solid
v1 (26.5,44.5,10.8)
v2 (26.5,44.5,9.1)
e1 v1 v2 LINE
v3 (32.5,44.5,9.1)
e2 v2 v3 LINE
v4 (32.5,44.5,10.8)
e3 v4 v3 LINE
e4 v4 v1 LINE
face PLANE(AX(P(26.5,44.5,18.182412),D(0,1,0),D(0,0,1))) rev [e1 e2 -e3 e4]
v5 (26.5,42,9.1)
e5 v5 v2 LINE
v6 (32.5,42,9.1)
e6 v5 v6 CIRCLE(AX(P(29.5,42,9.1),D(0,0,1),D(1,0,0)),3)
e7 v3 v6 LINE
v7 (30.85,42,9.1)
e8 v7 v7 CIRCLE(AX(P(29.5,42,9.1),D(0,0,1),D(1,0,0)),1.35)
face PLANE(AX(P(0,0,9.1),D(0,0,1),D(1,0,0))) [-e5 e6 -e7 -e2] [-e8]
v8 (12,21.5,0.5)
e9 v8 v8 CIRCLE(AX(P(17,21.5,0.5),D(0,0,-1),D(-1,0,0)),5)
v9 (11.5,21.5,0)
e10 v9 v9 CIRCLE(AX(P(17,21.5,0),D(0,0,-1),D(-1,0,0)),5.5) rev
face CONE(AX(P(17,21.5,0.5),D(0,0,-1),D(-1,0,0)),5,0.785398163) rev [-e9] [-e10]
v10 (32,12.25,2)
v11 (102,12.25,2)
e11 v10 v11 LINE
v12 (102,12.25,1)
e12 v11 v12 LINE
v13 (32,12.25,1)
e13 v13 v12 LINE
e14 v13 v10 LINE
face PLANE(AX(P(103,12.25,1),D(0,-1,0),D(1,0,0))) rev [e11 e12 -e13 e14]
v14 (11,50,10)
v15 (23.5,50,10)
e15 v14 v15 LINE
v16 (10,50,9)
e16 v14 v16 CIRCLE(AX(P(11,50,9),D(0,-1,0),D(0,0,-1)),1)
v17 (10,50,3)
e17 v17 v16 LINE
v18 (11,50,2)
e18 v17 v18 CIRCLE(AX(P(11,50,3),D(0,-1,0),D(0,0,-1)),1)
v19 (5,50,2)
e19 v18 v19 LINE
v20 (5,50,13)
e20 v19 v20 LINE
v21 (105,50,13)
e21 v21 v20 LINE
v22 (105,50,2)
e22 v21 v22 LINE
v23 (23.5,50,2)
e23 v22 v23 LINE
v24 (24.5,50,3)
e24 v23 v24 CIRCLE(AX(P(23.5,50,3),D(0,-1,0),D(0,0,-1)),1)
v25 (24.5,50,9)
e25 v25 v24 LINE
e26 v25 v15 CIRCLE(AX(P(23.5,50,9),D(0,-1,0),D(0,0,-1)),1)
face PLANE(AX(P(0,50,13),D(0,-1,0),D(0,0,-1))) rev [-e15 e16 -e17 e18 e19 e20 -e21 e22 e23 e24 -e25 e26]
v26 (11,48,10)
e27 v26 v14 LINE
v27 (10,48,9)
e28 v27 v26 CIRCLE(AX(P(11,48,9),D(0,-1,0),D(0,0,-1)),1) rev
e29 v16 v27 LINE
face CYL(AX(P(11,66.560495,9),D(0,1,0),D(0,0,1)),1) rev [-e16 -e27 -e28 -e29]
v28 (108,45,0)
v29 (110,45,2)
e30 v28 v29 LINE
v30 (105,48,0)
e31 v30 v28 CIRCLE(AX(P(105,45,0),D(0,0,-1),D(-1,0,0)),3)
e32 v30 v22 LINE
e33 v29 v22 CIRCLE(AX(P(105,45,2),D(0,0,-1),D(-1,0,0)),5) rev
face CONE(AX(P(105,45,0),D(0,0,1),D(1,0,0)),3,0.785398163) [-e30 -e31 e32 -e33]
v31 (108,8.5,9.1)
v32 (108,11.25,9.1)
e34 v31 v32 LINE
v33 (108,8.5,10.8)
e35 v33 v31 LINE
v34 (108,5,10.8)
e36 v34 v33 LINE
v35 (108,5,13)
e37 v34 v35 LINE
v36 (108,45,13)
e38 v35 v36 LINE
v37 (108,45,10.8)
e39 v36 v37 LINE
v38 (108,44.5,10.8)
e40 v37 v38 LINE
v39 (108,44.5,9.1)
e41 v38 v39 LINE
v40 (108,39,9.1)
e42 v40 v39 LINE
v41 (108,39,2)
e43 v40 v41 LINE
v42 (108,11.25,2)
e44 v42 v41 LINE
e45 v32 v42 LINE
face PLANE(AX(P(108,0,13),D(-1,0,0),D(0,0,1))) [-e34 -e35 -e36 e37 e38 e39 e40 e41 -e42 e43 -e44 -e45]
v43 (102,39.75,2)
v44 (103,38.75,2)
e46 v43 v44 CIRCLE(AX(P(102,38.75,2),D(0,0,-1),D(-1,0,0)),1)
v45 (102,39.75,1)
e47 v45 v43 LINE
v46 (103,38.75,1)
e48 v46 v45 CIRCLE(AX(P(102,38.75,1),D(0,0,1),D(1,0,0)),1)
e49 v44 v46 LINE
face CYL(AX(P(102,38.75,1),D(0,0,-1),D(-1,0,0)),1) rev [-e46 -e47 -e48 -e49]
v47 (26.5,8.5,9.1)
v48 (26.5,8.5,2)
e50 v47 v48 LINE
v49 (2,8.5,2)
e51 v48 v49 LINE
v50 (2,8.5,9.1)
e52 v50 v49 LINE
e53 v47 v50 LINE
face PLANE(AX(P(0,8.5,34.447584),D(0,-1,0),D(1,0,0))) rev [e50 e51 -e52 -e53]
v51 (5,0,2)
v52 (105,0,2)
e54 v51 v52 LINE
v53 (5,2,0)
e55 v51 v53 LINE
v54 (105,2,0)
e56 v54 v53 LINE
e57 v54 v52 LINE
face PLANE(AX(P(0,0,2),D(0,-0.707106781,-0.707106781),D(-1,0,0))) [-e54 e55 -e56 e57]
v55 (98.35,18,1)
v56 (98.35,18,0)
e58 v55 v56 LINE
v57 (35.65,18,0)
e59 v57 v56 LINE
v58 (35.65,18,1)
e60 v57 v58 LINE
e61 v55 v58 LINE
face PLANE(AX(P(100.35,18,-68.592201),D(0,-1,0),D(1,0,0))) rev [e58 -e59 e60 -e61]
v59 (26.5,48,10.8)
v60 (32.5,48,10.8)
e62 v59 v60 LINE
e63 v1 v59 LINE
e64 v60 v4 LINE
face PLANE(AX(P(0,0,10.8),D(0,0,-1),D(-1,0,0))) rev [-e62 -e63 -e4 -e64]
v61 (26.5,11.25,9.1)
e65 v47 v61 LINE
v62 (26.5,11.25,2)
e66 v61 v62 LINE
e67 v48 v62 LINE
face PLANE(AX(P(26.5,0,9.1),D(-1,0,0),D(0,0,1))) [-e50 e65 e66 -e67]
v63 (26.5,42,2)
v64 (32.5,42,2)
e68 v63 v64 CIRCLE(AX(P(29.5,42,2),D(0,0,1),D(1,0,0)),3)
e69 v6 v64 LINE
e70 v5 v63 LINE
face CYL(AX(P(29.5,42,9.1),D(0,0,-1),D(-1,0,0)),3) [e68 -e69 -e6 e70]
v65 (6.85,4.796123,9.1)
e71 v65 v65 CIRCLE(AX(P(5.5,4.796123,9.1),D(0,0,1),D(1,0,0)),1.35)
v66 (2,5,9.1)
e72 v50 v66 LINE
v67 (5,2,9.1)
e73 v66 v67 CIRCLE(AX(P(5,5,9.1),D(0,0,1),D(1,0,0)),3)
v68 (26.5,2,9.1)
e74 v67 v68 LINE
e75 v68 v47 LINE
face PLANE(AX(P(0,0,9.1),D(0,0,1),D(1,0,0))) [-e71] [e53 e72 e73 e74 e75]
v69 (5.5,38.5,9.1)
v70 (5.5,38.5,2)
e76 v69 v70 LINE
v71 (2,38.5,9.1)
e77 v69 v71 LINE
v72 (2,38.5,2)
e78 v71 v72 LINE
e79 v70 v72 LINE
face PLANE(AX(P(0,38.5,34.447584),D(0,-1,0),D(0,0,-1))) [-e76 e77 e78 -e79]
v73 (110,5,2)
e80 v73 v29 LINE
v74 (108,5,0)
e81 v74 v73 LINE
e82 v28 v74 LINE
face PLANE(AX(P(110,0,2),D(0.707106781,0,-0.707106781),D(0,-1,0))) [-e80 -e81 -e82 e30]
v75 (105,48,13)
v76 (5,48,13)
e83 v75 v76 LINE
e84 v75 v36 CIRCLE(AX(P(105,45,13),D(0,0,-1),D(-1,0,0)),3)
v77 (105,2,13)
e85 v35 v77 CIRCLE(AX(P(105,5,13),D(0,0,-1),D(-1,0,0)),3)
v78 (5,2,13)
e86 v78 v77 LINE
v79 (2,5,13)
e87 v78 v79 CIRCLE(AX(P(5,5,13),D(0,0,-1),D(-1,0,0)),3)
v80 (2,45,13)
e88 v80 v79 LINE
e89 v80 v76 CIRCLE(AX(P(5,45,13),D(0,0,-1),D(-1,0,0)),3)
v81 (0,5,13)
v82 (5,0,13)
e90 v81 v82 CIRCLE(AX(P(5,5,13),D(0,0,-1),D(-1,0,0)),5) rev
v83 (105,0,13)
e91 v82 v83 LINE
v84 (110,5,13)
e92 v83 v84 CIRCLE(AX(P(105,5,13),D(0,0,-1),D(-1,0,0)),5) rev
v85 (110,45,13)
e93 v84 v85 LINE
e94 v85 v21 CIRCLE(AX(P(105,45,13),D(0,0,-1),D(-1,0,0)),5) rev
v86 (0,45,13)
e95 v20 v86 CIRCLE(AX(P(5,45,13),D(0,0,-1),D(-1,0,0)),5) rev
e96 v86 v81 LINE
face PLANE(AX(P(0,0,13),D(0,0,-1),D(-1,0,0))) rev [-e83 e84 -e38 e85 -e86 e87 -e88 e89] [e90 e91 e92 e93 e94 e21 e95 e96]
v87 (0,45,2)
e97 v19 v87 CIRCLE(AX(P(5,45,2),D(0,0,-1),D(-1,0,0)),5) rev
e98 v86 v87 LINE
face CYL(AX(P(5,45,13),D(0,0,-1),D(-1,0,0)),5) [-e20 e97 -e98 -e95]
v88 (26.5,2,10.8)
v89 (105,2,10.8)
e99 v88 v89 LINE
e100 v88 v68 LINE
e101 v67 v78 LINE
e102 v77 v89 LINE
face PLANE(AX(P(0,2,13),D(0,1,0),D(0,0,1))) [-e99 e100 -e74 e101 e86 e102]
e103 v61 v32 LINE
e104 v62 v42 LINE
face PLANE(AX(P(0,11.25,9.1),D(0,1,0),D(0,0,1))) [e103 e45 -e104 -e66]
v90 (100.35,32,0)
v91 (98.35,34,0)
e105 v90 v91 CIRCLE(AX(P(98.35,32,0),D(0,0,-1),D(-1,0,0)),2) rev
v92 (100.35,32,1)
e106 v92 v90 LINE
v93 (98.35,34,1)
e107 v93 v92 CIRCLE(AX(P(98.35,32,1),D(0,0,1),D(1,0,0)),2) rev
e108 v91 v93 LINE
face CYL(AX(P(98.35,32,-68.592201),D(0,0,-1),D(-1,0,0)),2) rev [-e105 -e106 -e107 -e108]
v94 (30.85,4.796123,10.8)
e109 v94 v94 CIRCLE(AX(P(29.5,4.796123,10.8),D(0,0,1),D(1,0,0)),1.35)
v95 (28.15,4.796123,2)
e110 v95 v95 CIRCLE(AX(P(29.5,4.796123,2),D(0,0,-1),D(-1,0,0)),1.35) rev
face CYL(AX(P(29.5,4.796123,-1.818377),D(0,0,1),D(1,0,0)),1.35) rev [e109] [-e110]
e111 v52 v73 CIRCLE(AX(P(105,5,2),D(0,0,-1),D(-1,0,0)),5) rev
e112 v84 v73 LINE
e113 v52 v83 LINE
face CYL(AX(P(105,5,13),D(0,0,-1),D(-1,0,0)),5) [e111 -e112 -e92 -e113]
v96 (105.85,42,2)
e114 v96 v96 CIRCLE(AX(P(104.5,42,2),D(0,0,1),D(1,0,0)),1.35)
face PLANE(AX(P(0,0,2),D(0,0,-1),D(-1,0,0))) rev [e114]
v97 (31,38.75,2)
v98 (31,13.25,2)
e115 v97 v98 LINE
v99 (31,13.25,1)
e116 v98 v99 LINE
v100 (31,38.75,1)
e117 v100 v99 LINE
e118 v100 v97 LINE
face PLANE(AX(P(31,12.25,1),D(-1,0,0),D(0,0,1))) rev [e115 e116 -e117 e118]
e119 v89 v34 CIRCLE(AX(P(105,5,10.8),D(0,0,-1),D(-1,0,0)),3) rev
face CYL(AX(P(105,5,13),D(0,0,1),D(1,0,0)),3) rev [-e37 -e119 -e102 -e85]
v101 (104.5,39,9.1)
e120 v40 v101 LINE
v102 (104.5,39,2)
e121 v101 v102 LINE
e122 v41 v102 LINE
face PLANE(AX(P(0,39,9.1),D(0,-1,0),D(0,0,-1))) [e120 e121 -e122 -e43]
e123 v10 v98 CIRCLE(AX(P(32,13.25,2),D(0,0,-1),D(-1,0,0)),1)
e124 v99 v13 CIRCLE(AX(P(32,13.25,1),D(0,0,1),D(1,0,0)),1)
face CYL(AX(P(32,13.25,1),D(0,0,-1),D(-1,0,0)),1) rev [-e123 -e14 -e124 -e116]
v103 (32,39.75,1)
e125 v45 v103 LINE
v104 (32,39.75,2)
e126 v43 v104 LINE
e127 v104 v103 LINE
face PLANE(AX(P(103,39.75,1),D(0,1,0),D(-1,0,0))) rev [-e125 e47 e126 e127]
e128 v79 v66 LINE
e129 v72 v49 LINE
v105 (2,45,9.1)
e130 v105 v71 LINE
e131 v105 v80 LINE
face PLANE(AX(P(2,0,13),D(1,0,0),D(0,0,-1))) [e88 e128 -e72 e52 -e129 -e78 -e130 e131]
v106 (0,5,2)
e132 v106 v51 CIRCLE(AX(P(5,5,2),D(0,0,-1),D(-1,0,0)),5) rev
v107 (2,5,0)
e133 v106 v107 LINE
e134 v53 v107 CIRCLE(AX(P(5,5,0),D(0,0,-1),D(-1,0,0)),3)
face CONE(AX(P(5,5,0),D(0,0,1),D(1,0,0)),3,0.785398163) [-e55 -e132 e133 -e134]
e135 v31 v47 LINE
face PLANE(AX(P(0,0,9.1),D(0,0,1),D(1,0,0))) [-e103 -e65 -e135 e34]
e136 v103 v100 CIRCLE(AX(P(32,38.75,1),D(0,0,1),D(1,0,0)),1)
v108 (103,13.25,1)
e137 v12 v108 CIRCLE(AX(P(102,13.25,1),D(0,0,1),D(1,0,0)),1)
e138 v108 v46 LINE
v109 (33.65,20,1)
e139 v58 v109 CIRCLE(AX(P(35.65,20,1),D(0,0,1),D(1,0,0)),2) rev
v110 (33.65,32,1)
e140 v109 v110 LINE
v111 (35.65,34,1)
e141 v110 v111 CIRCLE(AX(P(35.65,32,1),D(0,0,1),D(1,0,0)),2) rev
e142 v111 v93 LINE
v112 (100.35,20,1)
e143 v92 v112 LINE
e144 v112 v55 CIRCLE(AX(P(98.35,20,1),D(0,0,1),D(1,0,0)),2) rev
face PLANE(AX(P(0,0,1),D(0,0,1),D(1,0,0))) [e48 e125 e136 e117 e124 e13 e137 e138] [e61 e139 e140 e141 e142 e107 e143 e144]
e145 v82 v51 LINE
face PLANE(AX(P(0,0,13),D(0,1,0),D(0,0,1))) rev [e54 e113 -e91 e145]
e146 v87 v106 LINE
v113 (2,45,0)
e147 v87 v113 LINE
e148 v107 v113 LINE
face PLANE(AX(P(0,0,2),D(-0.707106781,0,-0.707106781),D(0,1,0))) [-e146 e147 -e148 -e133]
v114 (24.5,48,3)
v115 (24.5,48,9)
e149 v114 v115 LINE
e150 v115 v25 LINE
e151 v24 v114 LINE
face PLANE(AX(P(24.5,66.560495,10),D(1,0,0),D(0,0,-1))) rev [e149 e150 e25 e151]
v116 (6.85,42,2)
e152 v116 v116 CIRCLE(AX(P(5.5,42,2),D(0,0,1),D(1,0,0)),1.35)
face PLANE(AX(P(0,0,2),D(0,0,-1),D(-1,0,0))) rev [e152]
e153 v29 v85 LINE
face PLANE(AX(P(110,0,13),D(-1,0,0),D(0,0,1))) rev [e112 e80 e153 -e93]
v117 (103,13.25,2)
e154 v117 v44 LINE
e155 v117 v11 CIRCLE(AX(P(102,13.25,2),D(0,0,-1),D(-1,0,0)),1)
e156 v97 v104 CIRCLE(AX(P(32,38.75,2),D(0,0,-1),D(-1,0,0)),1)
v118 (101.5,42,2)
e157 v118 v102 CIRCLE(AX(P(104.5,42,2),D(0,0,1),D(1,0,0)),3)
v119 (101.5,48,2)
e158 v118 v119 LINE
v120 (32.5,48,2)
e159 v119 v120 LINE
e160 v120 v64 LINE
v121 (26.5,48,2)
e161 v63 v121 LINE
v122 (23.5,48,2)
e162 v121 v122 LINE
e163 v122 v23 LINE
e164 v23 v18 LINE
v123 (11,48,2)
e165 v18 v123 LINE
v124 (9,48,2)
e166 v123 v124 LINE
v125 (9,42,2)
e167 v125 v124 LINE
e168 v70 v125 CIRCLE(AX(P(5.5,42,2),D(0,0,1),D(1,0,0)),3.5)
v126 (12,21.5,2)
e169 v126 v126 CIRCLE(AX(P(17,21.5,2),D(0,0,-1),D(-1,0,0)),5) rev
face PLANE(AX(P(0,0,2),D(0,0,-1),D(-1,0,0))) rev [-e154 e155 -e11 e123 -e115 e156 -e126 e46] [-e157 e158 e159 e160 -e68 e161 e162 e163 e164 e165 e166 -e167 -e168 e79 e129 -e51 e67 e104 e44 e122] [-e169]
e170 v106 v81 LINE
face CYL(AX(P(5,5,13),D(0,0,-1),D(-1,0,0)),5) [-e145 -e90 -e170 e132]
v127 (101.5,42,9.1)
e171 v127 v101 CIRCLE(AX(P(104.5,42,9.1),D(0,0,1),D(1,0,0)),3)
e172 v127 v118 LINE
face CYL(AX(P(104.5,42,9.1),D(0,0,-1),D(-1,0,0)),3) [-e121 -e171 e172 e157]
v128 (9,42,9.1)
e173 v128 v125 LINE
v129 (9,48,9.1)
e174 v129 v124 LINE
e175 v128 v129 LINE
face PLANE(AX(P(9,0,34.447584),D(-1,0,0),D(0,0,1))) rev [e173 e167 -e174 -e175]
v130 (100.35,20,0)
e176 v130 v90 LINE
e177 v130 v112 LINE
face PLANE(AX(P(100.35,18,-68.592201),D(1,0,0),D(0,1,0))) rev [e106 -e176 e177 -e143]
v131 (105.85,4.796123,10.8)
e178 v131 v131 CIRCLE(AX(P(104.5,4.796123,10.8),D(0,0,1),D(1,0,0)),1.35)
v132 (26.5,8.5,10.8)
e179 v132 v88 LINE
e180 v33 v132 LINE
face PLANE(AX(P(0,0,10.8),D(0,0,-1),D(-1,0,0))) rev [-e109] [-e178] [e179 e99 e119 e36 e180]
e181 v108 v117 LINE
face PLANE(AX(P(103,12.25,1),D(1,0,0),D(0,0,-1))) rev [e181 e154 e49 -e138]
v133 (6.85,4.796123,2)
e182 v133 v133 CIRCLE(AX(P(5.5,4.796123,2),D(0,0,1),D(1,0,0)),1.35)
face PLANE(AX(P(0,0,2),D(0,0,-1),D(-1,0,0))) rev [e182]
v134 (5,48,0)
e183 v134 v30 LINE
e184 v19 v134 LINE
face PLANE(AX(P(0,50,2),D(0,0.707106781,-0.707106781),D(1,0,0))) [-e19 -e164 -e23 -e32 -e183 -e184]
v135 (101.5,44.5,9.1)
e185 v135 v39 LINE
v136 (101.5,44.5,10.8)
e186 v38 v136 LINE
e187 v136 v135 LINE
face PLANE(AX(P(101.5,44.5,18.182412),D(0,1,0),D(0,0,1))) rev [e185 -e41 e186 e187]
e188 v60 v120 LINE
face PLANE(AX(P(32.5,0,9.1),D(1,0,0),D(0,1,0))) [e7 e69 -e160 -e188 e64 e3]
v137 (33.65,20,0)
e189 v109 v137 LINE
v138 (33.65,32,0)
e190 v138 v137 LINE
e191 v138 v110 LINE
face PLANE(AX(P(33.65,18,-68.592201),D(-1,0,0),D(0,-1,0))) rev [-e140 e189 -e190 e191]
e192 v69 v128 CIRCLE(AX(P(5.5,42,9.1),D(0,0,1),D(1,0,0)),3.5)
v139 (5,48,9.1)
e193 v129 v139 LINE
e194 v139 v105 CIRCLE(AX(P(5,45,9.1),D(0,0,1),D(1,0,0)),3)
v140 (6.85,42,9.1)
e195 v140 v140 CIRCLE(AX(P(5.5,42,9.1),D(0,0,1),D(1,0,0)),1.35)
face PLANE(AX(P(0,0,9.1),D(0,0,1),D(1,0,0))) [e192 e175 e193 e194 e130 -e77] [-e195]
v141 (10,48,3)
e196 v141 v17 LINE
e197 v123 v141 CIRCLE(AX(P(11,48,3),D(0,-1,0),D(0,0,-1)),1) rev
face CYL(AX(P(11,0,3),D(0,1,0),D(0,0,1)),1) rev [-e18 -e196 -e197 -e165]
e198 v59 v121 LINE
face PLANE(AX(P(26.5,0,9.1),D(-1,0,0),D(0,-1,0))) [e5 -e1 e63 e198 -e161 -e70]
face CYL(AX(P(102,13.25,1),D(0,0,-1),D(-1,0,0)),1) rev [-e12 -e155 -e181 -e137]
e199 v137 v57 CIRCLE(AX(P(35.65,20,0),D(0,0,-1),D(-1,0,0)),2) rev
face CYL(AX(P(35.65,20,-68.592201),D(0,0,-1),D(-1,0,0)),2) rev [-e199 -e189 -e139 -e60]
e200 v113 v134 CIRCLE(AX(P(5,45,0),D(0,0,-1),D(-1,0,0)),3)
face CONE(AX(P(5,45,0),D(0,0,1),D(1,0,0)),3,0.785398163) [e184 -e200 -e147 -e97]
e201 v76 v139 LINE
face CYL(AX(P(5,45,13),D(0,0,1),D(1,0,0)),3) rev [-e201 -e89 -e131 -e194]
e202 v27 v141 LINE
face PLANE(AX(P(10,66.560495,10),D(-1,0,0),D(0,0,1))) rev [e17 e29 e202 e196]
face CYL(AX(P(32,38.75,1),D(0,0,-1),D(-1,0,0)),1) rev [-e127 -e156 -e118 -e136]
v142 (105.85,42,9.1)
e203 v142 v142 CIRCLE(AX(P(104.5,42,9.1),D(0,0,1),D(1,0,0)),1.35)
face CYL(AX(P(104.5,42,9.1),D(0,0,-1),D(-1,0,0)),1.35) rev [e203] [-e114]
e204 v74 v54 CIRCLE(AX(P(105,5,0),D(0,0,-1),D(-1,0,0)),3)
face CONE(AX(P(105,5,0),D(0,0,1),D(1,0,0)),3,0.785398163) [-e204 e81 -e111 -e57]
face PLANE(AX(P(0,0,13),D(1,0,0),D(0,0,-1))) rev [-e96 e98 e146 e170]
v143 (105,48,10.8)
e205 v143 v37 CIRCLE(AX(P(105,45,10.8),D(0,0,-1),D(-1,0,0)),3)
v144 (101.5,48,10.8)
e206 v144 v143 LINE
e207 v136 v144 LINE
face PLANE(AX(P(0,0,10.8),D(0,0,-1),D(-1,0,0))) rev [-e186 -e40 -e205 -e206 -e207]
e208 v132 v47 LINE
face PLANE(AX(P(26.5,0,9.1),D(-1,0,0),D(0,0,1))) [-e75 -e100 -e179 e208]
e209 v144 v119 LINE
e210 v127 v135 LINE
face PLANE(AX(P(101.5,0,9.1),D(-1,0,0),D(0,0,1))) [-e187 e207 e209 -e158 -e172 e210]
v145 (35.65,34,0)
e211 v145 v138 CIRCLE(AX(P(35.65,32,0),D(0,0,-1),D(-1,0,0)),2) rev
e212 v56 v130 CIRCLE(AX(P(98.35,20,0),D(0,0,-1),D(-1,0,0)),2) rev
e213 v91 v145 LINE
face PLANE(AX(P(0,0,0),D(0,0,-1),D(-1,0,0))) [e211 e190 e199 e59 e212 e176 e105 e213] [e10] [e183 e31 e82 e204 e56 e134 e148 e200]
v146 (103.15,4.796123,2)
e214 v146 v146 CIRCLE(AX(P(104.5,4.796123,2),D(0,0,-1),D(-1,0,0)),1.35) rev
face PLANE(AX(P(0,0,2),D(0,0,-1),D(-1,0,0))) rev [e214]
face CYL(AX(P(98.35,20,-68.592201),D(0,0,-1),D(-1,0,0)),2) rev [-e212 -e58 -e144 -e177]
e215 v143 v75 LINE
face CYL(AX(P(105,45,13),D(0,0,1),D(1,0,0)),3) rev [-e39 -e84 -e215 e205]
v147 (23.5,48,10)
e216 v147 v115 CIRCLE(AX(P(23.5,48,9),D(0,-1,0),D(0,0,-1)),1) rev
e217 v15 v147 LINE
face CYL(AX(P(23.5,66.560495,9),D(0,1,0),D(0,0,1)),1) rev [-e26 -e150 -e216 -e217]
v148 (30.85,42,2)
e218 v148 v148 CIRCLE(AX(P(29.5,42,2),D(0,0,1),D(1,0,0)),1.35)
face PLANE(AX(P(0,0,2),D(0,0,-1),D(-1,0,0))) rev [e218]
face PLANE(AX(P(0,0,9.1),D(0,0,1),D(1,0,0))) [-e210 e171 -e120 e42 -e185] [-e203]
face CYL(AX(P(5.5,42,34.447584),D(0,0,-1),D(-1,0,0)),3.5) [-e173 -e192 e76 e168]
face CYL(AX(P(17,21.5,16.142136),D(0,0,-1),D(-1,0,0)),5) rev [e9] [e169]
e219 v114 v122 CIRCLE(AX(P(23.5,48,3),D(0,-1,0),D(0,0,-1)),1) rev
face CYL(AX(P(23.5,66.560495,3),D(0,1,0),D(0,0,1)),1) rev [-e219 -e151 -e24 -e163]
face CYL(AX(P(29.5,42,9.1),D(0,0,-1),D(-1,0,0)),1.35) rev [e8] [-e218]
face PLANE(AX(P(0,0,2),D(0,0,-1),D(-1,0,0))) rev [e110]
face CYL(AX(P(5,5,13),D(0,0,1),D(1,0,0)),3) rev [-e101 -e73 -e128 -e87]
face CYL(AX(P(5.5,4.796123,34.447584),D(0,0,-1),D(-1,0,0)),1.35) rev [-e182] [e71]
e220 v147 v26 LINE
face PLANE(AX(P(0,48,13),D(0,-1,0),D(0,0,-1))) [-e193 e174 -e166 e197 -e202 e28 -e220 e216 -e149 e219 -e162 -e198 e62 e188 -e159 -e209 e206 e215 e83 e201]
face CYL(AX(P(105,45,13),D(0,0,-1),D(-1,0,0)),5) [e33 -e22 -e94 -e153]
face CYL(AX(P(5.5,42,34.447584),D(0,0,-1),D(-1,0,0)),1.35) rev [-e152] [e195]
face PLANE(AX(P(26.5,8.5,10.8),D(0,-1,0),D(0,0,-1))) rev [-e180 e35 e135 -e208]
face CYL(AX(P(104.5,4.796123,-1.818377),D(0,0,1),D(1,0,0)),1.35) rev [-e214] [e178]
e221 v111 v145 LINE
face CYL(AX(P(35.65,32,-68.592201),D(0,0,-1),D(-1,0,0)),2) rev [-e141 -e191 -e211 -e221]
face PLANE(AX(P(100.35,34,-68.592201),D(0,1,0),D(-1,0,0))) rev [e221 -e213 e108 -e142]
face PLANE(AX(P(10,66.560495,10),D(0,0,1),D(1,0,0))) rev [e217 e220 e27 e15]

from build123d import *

# Parameters (mm, degrees)
SKICA1_W                    = 110
SKICA1_H                    = 50
P_IDAT_VYSUNUT_M1_DEPTH     = 13
SKO_EPINA1_T                = -2
SKICA3_W                    = 66.7
SKICA3_H                    = 16
ODEBRAT_VYSUNUT_M1_DEPTH    = 2
SKICA6_R                    = 1.35
SKICA6_W                    = 81.5
SKICA6_H                    = 9.25
P_IDAT_VYSUNUT_M3_DEPTH     = 7.1
SKICA8_W                    = 72
SKICA8_H                    = 27.5
ODEBRAT_VYSUNUT_M2_DEPTH    = 1
ZAOBLIT3_R                  = 1
ZAOBLIT4_R                  = 2
SKICA9_W                    = 81.5
SKICA9_H                    = 6.5
P_IDAT_VYSUNUT_M4_DEPTH     = 1.7
SKICA10_R                   = 1.35
ODEBRAT_VYSUNUT_M3_DEPTH    = 8.8
ZAOBLIT5_R                  = 5
ZAOBLIT6_R                  = 3
SKICA11_R                   = 5
ODEBRAT_VYSUNUT_M4_DEPTH    = 2
ZKOSEN_1_SIZE               = 2
P_IDAT_VYSUNUT_M5_OUTLINE_R = 1.35
P_IDAT_VYSUNUT_M5_DEPTH     = 7.1
SKICA13_W                   = 14.5
SKICA13_H                   = 8
ODEBRAT_VYSUNUT_M5_DEPTH    = 2
ZAOBLIT7_R                  = 1
ZAOBLIT8_R                  = 1
P_IDAT_START                = 1.7
SKICA14_W                   = 6
SKICA14_H                   = 3.5
P_IDAT_VYSUNUT_M6_DEPTH     = 1.7


# Read off the part's stored shape, not the designer's step: Přidat vysunutím5
with BuildPart() as part:
    # Skica1 → Přidat vysunutím1 (new body)
    with BuildSketch(Plane.XY):
        with Locations((55, 25)):
            Rectangle(SKICA1_W, SKICA1_H)
    extrude(amount=P_IDAT_VYSUNUT_M1_DEPTH)

    # Skořepina1
    sko_epina1_openings = [part.faces().sort_by_distance(p)[0] for p in [
        (55, 25, 13),
    ]]
    offset(amount=SKO_EPINA1_T, openings=sko_epina1_openings, kind=Kind.INTERSECTION)

    # Skica3 → Odebrat vysunutím1 (cut)
    with BuildSketch(Plane.XY.offset(2)):
        with Locations((67, 26)):
            Rectangle(SKICA3_W, SKICA3_H)
    extrude(amount=-ODEBRAT_VYSUNUT_M1_DEPTH, mode=Mode.SUBTRACT)

    # Skica6 → Přidat vysunutím3 (add)
    # profile 1 of 3: a face of its own
    with BuildSketch(Plane.XY.offset(2)):
        with BuildLine():
            Line((26.5, 42), (26.5, 48))
            Line((26.5, 48), (32.5, 48))
            Line((32.5, 48), (32.5, 42))
            ThreePointArc((32.5, 42), (29.5, 39), (26.5, 42))
        make_face()
        with Locations((29.5, 42)):
            Circle(SKICA6_R, mode=Mode.SUBTRACT)
    # profile 2 of 3: a face of its own
    with BuildSketch(Plane.XY.offset(2)):
        with BuildLine():
            Line((101.5, 42), (101.5, 48))
            Line((101.5, 48), (108, 48))
            Line((108, 48), (108, 39))
            Line((108, 39), (104.5, 39))
            ThreePointArc((104.5, 39), (102.378679656, 39.878679656), (101.5, 42))
        make_face()
        with Locations((104.5, 42)):
            Circle(SKICA6_R, mode=Mode.SUBTRACT)
    # profile 3 of 3: a face of its own
    with BuildSketch(Plane.XY.offset(2)):
        with Locations((67.25, 6.625)):
            Rectangle(SKICA6_W, SKICA6_H)
    extrude(amount=P_IDAT_VYSUNUT_M3_DEPTH)

    # Skica8 → Odebrat vysunutím2 (cut)
    with BuildSketch(Plane.XY.offset(2)):
        with Locations((67, 26)):
            Rectangle(SKICA8_W, SKICA8_H)
    extrude(amount=-ODEBRAT_VYSUNUT_M2_DEPTH, mode=Mode.SUBTRACT)

    # Zaoblit3
    # the kernel refuses this fillet: 1 mm, written as the material it adds along each edge
    with BuildSketch(Plane(origin=(31, 12.25, 2), x_dir=(1, 0, 0), z_dir=(0, 0, -1)), Plane(origin=(31, 39.75, 2), x_dir=(0, -1, 0), z_dir=(0, 0, -1))) as zaoblit3_piece_1:
        with BuildLine():
            CenterArc((ZAOBLIT3_R, -ZAOBLIT3_R), ZAOBLIT3_R, 90, 90)
            Line((0, -ZAOBLIT3_R), (0, 0))
            Line((0, 0), (ZAOBLIT3_R, 0))
        make_face()
    extrude(amount=1)
    with BuildSketch(Plane(origin=(103, 39.75, 2), x_dir=(0, -1, 0), z_dir=(0, 0, -1)), Plane(origin=(103, 12.25, 2), x_dir=(-1, 0, 0), z_dir=(0, 0, -1))) as zaoblit3_piece_2:
        with BuildLine():
            CenterArc((ZAOBLIT3_R, ZAOBLIT3_R), ZAOBLIT3_R, 180, 90)
            Line((0, ZAOBLIT3_R), (0, 0))
            Line((0, 0), (ZAOBLIT3_R, 0))
        make_face()
    extrude(amount=1)

    # Zaoblit4
    zaoblit4_edges = [part.edges().sort_by_distance(p)[0] for p in [
        (100.35, 18, 0.5),
        (100.35, 34, 0.5),
        (33.65, 34, 0.5),
        (33.65, 18, 0.5),
    ]]
    fillet(zaoblit4_edges, radius=ZAOBLIT4_R)

    # Skica9 → Přidat vysunutím4 (add)
    with BuildSketch(Plane.XY.offset(9.1)):
        with Locations((67.25, 5.25)):
            Rectangle(SKICA9_W, SKICA9_H)
    extrude(amount=P_IDAT_VYSUNUT_M4_DEPTH)

    # Skica10 → Odebrat vysunutím3 (cut)
    with BuildSketch(Plane.XY.offset(10.8)):
        with Locations((104.5, 4.796123071)):
            Circle(SKICA10_R)
        with Locations((29.5, 4.796123071)):
            Circle(SKICA10_R)
    extrude(amount=-ODEBRAT_VYSUNUT_M3_DEPTH, mode=Mode.SUBTRACT)

    # Zaoblit5
    zaoblit5_edges = [part.edges().sort_by_distance(p)[0] for p in [
        (0, 50, 6.5),
        (110, 50, 6.5),
        (110, 0, 6.5),
        (0, 0, 6.5),
    ]]
    fillet(zaoblit5_edges, radius=ZAOBLIT5_R)

    # Zaoblit6
    zaoblit6_edges = [part.edges().sort_by_distance(p)[0] for p in [
        (2, 48, 7.5),
        (2, 2, 7.5),
        (108, 2, 11.9),
        (108, 48, 11.05),
    ]]
    fillet(zaoblit6_edges, radius=ZAOBLIT6_R)

    # Skica11 → Odebrat vysunutím4 (cut)
    with BuildSketch(Plane(origin=(0, 0, 0), x_dir=(-1, 0, 0), z_dir=(0, 0, -1))):
        with Locations((-17, 21.5)):
            Circle(SKICA11_R)
    extrude(amount=-ODEBRAT_VYSUNUT_M4_DEPTH, mode=Mode.SUBTRACT)

    # Zkosení1
    zkosen_1_edges = [part.edges().sort_by_distance(p)[0] for p in [
        (55, 0, 0),
        (0, 25, 0),
        (55, 50, 0),
        (110, 25, 0),
        (1.464466094, 48.535533906, 0),
        (108.535533906, 48.535533906, 0),
        (108.535533906, 1.464466094, 0),
        (1.464466094, 1.464466094, 0),
    ]]
    chamfer(zkosen_1_edges, length=ZKOSEN_1_SIZE)

    # Přidat vysunutím5 outline → Přidat vysunutím5 (add)
    # profile 1 of 2: a face of its own
    with BuildSketch(Plane.XY.offset(2)):
        with BuildLine():
            Line((2, 45), (2, 38.5))
            Line((2, 38.5), (5.5, 38.5))
            ThreePointArc((5.5, 38.5), (7.974873734, 39.525126266), (9, 42))
            Line((9, 42), (9, 48))
            Line((9, 48), (5, 48))
            ThreePointArc((5, 48), (2.878679656, 47.121320344), (2, 45))
        make_face()
        with Locations((5.5, 42)):
            Circle(P_IDAT_VYSUNUT_M5_OUTLINE_R, mode=Mode.SUBTRACT)
    # profile 2 of 2: a face of its own
    with BuildSketch(Plane.XY.offset(2)):
        with BuildLine():
            Line((26.5, 8.5), (2, 8.5))
            Line((2, 8.5), (2, 5))
            ThreePointArc((2, 5), (2.878679656, 2.878679656), (5, 2))
            Line((5, 2), (26.5, 2))
            Line((26.5, 2), (26.5, 8.5))
        make_face()
        with Locations((5.5, 4.796123071)):
            Circle(P_IDAT_VYSUNUT_M5_OUTLINE_R, mode=Mode.SUBTRACT)
    extrude(amount=P_IDAT_VYSUNUT_M5_DEPTH)

    # P_idat vysunut_m5 2 outline → P_idat vysunut_m5 2 (revolve, cut)
    with BuildSketch(Plane(origin=(17, 21.5, 0), x_dir=(1, 0, 0), z_dir=(0, -1, 0))):
        Polygon((5.5, 0), (5, 0.5), (5, 0), align=None)
    revolve(axis=Axis((17, 21.5, 0), (0, 0, 1)), mode=Mode.SUBTRACT)

    # Skica13 → Odebrat vysunutím5 (cut)
    with BuildSketch(Plane.XZ.offset(-48)):
        with Locations((17.25, 6)):
            Rectangle(SKICA13_W, SKICA13_H)
    extrude(amount=-ODEBRAT_VYSUNUT_M5_DEPTH, mode=Mode.SUBTRACT)

    # Zaoblit7
    zaoblit7_edges = [part.edges().sort_by_distance(p)[0] for p in [
        (10, 49, 10),
        (24.5, 49, 10),
    ]]
    fillet(zaoblit7_edges, radius=ZAOBLIT7_R)

    # Zaoblit8
    zaoblit8_edges = [part.edges().sort_by_distance(p)[0] for p in [
        (10, 49, 2),
        (24.5, 49, 2),
    ]]
    fillet(zaoblit8_edges, radius=ZAOBLIT8_R)

    # Skica14 → Přidat vysunutím6 (add)
    with BuildSketch(Plane.XY.offset(9.1).offset(P_IDAT_START)):
        with Locations((29.5, 46.25)):
            Rectangle(SKICA14_W, SKICA14_H)
        with BuildLine():
            Line((101.5, 48), (105, 48))
            ThreePointArc((105, 48), (107.121320344, 47.121320344), (108, 45))
            Line((108, 45), (108, 44.5))
            Line((108, 44.5), (101.5, 44.5))
            Line((101.5, 44.5), (101.5, 48))
        make_face()
    extrude(amount=-P_IDAT_VYSUNUT_M6_DEPTH)


solid = part.part
